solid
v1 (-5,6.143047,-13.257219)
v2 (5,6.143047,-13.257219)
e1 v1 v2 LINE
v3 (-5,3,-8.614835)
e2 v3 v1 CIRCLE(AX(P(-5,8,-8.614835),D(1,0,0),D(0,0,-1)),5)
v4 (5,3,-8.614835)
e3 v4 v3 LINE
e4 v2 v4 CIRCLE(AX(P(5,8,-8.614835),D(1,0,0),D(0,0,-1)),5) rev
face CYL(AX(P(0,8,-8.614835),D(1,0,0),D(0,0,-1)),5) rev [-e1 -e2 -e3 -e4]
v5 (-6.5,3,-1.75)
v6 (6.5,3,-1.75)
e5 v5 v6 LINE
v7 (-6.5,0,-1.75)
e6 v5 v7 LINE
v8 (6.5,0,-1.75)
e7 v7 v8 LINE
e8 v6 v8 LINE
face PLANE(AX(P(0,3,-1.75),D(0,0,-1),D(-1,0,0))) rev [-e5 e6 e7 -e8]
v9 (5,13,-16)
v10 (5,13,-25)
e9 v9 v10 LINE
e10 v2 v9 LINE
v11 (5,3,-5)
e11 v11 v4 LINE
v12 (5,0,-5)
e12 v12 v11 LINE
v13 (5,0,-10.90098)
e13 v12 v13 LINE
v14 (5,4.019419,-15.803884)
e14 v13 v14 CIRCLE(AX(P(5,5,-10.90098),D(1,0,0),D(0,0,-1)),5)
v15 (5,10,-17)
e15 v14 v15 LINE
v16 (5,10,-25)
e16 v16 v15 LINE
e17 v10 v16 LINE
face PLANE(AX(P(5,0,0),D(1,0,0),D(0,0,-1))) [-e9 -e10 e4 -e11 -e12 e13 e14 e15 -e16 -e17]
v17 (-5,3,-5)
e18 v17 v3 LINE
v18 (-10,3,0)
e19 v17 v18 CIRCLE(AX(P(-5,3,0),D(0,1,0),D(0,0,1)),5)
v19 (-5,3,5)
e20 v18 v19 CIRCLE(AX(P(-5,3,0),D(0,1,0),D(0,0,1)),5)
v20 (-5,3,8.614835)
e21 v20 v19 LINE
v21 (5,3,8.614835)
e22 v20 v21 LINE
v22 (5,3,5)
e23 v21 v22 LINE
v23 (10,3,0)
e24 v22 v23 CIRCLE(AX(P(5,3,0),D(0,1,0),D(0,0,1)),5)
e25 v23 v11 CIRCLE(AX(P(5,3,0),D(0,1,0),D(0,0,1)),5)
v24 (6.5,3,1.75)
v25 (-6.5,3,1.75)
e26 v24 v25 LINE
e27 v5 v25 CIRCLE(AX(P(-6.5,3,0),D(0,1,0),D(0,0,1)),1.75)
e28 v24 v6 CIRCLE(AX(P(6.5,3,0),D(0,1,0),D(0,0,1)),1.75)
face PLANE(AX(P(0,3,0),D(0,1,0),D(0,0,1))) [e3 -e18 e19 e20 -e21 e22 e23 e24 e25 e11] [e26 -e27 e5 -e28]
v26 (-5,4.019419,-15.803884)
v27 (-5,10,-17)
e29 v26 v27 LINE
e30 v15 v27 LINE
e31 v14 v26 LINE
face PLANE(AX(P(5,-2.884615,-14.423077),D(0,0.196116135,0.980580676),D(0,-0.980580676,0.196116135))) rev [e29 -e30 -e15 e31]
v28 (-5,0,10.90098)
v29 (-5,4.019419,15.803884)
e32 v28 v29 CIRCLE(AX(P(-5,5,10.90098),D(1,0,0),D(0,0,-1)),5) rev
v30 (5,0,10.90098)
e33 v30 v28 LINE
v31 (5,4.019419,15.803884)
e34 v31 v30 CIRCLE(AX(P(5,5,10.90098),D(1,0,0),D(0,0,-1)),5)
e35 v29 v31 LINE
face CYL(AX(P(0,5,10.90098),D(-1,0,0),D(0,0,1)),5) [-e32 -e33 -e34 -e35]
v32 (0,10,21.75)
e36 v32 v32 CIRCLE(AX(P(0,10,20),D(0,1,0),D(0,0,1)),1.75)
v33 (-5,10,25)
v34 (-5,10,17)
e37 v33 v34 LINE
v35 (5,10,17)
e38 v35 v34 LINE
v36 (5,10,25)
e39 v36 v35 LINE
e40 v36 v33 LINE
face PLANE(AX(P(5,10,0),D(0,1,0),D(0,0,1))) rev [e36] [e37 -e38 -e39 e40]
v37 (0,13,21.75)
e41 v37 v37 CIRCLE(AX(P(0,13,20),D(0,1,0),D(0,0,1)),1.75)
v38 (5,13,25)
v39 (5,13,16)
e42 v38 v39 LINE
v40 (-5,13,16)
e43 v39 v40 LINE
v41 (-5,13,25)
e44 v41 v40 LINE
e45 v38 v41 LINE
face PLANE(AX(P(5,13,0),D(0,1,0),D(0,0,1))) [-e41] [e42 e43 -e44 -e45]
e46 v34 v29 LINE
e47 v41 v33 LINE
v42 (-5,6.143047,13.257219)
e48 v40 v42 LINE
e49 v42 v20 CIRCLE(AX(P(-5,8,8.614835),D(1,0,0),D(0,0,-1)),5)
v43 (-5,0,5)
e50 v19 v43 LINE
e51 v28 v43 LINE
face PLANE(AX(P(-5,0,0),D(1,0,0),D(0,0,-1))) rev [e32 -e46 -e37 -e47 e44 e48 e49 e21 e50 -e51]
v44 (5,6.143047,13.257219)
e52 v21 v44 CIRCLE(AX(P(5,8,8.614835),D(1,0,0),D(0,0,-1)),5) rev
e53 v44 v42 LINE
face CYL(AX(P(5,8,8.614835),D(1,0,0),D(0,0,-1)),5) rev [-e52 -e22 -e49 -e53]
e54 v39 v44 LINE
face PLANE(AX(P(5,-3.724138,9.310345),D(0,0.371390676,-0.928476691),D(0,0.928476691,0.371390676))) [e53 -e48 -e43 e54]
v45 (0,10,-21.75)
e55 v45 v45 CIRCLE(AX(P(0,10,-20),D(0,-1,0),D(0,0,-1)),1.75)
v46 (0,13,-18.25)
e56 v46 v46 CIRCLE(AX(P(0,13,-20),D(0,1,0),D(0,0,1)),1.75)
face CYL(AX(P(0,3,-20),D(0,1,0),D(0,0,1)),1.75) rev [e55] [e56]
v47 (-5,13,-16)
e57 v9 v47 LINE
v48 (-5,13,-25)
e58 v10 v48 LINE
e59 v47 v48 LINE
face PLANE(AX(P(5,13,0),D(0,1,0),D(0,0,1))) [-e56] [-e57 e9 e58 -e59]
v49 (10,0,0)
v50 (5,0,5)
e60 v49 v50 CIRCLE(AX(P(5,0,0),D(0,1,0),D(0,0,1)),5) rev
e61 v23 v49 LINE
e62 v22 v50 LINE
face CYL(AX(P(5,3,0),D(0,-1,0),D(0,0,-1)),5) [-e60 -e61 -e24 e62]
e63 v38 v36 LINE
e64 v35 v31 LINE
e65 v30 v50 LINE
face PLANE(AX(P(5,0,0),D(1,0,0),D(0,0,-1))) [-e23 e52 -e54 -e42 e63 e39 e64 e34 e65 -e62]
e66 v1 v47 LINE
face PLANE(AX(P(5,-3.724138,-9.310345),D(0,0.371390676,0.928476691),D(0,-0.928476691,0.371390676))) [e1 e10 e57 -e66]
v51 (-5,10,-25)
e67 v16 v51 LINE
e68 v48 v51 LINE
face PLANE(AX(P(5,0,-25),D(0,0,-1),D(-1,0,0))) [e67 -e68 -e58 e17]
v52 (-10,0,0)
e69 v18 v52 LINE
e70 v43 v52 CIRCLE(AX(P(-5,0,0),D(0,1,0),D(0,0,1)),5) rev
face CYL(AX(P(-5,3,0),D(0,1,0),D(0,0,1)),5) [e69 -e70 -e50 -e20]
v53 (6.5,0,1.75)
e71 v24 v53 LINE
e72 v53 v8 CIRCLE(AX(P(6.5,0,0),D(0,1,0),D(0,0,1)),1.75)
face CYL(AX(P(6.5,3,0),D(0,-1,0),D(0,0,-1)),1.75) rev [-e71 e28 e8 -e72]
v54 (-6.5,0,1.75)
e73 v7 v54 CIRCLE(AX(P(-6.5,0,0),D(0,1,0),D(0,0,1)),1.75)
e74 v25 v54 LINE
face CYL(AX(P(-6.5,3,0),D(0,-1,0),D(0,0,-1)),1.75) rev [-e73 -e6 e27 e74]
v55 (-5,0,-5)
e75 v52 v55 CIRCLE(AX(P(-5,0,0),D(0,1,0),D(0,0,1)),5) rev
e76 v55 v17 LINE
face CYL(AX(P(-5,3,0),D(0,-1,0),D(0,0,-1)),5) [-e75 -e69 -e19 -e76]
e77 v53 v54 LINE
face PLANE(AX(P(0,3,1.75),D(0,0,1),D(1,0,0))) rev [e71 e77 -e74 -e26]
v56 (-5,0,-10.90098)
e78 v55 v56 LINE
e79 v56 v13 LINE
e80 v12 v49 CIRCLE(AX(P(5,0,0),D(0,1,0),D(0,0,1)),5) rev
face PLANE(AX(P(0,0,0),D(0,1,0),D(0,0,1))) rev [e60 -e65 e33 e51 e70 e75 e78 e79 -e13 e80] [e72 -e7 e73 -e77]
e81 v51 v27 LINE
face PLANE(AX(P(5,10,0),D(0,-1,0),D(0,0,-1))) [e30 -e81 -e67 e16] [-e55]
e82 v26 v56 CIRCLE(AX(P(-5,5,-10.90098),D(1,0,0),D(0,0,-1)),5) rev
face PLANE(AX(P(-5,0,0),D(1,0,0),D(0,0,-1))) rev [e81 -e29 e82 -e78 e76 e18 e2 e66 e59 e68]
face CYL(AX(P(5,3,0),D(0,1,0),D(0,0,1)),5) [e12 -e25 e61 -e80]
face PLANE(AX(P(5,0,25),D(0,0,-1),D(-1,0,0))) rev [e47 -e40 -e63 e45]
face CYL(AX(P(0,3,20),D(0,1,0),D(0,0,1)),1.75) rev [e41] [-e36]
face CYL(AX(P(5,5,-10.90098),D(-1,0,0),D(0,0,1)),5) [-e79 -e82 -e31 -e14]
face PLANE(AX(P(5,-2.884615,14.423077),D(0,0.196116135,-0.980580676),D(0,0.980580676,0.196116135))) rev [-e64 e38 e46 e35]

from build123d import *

# Parameters (mm, degrees)
SKETCH_1_W          = 20
SKETCH_1_H          = 10
EXTRUDE_1_DEPTH     = 3
SKETCH_2_W          = 8
SKETCH_2_H          = 3
EXTRUDE_2_DEPTH     = 5
SKETCH_3_R          = 1.75
CUT_EXTRUDE_1_DEPTH = 10
FILLET_1_R          = 5
FILLET_2_R          = 5


with BuildPart() as part:
    # 草图1 → 凸台-拉伸1 (new body)
    with BuildSketch(Plane(origin=(0, 0, 0), x_dir=(1, 0, 0), z_dir=(0, 1, 0))):
        Rectangle(SKETCH_1_W, SKETCH_1_H)
        with BuildLine():
            ThreePointArc((-6.5, -1.75), (-8.25, 0), (-6.5, 1.75))
            Line((-6.5, 1.75), (6.5, 1.75))
            ThreePointArc((6.5, 1.75), (7.737436867, 1.237436867), (8.25, 0))
            ThreePointArc((8.25, 0), (7.737436867, -1.237436867), (6.5, -1.75))
            Line((6.5, -1.75), (-6.5, -1.75))
        make_face(mode=Mode.SUBTRACT)
    extrude(amount=EXTRUDE_1_DEPTH)

    # 草图2 → 凸台-拉伸2 (add, symmetric)
    with BuildSketch(Plane(origin=(0, 0, 0), x_dir=(0, 0, -1), z_dir=(1, 0, 0))):
        with Locations((-21, 11.5)):
            Rectangle(SKETCH_2_W, SKETCH_2_H)
        Polygon((-12, 3), (-5, 3), (-5, 0), (-15, 0), (-17, 10), (-17, 13), (-16, 13), align=None)
        Polygon((16, 13), (17, 13), (17, 10), (15, 0), (5, 0), (5, 3), (12, 3), align=None)
        with Locations((21, 11.5)):
            Rectangle(SKETCH_2_W, SKETCH_2_H)
    extrude(amount=EXTRUDE_2_DEPTH, both=True)

    # 草图3 → 切除-拉伸1 (cut)
    with BuildSketch(Plane(origin=(0, 13, 0), x_dir=(1, 0, 0), z_dir=(0, 1, 0))):
        with Locations(Location((0, 20, 0), (0, 0, 270))):
            Circle(SKETCH_3_R)
        with Locations(Location((0, -20, 0), (0, 0, 270))):
            Circle(SKETCH_3_R)
    extrude(amount=-CUT_EXTRUDE_1_DEPTH, mode=Mode.SUBTRACT)

    # 圆角1
    fillet_1_edges = [part.edges().sort_by_distance(p)[0] for p in [
        (0, 0, 15),
        (0, 3, 12),
        (0, 3, -12),
        (0, 0, -15),
    ]]
    fillet(fillet_1_edges, radius=FILLET_1_R)

    # 圆角2
    fillet_2_edges = [part.edges().sort_by_distance(p)[0] for p in [
        (-10, 1.5, 5),
        (-10, 1.5, -5),
        (10, 1.5, -5),
        (10, 1.5, 5),
    ]]
    fillet(fillet_2_edges, radius=FILLET_2_R - 0.0001)  # a hair under: the kernel refuses the full size


solid = part.part
